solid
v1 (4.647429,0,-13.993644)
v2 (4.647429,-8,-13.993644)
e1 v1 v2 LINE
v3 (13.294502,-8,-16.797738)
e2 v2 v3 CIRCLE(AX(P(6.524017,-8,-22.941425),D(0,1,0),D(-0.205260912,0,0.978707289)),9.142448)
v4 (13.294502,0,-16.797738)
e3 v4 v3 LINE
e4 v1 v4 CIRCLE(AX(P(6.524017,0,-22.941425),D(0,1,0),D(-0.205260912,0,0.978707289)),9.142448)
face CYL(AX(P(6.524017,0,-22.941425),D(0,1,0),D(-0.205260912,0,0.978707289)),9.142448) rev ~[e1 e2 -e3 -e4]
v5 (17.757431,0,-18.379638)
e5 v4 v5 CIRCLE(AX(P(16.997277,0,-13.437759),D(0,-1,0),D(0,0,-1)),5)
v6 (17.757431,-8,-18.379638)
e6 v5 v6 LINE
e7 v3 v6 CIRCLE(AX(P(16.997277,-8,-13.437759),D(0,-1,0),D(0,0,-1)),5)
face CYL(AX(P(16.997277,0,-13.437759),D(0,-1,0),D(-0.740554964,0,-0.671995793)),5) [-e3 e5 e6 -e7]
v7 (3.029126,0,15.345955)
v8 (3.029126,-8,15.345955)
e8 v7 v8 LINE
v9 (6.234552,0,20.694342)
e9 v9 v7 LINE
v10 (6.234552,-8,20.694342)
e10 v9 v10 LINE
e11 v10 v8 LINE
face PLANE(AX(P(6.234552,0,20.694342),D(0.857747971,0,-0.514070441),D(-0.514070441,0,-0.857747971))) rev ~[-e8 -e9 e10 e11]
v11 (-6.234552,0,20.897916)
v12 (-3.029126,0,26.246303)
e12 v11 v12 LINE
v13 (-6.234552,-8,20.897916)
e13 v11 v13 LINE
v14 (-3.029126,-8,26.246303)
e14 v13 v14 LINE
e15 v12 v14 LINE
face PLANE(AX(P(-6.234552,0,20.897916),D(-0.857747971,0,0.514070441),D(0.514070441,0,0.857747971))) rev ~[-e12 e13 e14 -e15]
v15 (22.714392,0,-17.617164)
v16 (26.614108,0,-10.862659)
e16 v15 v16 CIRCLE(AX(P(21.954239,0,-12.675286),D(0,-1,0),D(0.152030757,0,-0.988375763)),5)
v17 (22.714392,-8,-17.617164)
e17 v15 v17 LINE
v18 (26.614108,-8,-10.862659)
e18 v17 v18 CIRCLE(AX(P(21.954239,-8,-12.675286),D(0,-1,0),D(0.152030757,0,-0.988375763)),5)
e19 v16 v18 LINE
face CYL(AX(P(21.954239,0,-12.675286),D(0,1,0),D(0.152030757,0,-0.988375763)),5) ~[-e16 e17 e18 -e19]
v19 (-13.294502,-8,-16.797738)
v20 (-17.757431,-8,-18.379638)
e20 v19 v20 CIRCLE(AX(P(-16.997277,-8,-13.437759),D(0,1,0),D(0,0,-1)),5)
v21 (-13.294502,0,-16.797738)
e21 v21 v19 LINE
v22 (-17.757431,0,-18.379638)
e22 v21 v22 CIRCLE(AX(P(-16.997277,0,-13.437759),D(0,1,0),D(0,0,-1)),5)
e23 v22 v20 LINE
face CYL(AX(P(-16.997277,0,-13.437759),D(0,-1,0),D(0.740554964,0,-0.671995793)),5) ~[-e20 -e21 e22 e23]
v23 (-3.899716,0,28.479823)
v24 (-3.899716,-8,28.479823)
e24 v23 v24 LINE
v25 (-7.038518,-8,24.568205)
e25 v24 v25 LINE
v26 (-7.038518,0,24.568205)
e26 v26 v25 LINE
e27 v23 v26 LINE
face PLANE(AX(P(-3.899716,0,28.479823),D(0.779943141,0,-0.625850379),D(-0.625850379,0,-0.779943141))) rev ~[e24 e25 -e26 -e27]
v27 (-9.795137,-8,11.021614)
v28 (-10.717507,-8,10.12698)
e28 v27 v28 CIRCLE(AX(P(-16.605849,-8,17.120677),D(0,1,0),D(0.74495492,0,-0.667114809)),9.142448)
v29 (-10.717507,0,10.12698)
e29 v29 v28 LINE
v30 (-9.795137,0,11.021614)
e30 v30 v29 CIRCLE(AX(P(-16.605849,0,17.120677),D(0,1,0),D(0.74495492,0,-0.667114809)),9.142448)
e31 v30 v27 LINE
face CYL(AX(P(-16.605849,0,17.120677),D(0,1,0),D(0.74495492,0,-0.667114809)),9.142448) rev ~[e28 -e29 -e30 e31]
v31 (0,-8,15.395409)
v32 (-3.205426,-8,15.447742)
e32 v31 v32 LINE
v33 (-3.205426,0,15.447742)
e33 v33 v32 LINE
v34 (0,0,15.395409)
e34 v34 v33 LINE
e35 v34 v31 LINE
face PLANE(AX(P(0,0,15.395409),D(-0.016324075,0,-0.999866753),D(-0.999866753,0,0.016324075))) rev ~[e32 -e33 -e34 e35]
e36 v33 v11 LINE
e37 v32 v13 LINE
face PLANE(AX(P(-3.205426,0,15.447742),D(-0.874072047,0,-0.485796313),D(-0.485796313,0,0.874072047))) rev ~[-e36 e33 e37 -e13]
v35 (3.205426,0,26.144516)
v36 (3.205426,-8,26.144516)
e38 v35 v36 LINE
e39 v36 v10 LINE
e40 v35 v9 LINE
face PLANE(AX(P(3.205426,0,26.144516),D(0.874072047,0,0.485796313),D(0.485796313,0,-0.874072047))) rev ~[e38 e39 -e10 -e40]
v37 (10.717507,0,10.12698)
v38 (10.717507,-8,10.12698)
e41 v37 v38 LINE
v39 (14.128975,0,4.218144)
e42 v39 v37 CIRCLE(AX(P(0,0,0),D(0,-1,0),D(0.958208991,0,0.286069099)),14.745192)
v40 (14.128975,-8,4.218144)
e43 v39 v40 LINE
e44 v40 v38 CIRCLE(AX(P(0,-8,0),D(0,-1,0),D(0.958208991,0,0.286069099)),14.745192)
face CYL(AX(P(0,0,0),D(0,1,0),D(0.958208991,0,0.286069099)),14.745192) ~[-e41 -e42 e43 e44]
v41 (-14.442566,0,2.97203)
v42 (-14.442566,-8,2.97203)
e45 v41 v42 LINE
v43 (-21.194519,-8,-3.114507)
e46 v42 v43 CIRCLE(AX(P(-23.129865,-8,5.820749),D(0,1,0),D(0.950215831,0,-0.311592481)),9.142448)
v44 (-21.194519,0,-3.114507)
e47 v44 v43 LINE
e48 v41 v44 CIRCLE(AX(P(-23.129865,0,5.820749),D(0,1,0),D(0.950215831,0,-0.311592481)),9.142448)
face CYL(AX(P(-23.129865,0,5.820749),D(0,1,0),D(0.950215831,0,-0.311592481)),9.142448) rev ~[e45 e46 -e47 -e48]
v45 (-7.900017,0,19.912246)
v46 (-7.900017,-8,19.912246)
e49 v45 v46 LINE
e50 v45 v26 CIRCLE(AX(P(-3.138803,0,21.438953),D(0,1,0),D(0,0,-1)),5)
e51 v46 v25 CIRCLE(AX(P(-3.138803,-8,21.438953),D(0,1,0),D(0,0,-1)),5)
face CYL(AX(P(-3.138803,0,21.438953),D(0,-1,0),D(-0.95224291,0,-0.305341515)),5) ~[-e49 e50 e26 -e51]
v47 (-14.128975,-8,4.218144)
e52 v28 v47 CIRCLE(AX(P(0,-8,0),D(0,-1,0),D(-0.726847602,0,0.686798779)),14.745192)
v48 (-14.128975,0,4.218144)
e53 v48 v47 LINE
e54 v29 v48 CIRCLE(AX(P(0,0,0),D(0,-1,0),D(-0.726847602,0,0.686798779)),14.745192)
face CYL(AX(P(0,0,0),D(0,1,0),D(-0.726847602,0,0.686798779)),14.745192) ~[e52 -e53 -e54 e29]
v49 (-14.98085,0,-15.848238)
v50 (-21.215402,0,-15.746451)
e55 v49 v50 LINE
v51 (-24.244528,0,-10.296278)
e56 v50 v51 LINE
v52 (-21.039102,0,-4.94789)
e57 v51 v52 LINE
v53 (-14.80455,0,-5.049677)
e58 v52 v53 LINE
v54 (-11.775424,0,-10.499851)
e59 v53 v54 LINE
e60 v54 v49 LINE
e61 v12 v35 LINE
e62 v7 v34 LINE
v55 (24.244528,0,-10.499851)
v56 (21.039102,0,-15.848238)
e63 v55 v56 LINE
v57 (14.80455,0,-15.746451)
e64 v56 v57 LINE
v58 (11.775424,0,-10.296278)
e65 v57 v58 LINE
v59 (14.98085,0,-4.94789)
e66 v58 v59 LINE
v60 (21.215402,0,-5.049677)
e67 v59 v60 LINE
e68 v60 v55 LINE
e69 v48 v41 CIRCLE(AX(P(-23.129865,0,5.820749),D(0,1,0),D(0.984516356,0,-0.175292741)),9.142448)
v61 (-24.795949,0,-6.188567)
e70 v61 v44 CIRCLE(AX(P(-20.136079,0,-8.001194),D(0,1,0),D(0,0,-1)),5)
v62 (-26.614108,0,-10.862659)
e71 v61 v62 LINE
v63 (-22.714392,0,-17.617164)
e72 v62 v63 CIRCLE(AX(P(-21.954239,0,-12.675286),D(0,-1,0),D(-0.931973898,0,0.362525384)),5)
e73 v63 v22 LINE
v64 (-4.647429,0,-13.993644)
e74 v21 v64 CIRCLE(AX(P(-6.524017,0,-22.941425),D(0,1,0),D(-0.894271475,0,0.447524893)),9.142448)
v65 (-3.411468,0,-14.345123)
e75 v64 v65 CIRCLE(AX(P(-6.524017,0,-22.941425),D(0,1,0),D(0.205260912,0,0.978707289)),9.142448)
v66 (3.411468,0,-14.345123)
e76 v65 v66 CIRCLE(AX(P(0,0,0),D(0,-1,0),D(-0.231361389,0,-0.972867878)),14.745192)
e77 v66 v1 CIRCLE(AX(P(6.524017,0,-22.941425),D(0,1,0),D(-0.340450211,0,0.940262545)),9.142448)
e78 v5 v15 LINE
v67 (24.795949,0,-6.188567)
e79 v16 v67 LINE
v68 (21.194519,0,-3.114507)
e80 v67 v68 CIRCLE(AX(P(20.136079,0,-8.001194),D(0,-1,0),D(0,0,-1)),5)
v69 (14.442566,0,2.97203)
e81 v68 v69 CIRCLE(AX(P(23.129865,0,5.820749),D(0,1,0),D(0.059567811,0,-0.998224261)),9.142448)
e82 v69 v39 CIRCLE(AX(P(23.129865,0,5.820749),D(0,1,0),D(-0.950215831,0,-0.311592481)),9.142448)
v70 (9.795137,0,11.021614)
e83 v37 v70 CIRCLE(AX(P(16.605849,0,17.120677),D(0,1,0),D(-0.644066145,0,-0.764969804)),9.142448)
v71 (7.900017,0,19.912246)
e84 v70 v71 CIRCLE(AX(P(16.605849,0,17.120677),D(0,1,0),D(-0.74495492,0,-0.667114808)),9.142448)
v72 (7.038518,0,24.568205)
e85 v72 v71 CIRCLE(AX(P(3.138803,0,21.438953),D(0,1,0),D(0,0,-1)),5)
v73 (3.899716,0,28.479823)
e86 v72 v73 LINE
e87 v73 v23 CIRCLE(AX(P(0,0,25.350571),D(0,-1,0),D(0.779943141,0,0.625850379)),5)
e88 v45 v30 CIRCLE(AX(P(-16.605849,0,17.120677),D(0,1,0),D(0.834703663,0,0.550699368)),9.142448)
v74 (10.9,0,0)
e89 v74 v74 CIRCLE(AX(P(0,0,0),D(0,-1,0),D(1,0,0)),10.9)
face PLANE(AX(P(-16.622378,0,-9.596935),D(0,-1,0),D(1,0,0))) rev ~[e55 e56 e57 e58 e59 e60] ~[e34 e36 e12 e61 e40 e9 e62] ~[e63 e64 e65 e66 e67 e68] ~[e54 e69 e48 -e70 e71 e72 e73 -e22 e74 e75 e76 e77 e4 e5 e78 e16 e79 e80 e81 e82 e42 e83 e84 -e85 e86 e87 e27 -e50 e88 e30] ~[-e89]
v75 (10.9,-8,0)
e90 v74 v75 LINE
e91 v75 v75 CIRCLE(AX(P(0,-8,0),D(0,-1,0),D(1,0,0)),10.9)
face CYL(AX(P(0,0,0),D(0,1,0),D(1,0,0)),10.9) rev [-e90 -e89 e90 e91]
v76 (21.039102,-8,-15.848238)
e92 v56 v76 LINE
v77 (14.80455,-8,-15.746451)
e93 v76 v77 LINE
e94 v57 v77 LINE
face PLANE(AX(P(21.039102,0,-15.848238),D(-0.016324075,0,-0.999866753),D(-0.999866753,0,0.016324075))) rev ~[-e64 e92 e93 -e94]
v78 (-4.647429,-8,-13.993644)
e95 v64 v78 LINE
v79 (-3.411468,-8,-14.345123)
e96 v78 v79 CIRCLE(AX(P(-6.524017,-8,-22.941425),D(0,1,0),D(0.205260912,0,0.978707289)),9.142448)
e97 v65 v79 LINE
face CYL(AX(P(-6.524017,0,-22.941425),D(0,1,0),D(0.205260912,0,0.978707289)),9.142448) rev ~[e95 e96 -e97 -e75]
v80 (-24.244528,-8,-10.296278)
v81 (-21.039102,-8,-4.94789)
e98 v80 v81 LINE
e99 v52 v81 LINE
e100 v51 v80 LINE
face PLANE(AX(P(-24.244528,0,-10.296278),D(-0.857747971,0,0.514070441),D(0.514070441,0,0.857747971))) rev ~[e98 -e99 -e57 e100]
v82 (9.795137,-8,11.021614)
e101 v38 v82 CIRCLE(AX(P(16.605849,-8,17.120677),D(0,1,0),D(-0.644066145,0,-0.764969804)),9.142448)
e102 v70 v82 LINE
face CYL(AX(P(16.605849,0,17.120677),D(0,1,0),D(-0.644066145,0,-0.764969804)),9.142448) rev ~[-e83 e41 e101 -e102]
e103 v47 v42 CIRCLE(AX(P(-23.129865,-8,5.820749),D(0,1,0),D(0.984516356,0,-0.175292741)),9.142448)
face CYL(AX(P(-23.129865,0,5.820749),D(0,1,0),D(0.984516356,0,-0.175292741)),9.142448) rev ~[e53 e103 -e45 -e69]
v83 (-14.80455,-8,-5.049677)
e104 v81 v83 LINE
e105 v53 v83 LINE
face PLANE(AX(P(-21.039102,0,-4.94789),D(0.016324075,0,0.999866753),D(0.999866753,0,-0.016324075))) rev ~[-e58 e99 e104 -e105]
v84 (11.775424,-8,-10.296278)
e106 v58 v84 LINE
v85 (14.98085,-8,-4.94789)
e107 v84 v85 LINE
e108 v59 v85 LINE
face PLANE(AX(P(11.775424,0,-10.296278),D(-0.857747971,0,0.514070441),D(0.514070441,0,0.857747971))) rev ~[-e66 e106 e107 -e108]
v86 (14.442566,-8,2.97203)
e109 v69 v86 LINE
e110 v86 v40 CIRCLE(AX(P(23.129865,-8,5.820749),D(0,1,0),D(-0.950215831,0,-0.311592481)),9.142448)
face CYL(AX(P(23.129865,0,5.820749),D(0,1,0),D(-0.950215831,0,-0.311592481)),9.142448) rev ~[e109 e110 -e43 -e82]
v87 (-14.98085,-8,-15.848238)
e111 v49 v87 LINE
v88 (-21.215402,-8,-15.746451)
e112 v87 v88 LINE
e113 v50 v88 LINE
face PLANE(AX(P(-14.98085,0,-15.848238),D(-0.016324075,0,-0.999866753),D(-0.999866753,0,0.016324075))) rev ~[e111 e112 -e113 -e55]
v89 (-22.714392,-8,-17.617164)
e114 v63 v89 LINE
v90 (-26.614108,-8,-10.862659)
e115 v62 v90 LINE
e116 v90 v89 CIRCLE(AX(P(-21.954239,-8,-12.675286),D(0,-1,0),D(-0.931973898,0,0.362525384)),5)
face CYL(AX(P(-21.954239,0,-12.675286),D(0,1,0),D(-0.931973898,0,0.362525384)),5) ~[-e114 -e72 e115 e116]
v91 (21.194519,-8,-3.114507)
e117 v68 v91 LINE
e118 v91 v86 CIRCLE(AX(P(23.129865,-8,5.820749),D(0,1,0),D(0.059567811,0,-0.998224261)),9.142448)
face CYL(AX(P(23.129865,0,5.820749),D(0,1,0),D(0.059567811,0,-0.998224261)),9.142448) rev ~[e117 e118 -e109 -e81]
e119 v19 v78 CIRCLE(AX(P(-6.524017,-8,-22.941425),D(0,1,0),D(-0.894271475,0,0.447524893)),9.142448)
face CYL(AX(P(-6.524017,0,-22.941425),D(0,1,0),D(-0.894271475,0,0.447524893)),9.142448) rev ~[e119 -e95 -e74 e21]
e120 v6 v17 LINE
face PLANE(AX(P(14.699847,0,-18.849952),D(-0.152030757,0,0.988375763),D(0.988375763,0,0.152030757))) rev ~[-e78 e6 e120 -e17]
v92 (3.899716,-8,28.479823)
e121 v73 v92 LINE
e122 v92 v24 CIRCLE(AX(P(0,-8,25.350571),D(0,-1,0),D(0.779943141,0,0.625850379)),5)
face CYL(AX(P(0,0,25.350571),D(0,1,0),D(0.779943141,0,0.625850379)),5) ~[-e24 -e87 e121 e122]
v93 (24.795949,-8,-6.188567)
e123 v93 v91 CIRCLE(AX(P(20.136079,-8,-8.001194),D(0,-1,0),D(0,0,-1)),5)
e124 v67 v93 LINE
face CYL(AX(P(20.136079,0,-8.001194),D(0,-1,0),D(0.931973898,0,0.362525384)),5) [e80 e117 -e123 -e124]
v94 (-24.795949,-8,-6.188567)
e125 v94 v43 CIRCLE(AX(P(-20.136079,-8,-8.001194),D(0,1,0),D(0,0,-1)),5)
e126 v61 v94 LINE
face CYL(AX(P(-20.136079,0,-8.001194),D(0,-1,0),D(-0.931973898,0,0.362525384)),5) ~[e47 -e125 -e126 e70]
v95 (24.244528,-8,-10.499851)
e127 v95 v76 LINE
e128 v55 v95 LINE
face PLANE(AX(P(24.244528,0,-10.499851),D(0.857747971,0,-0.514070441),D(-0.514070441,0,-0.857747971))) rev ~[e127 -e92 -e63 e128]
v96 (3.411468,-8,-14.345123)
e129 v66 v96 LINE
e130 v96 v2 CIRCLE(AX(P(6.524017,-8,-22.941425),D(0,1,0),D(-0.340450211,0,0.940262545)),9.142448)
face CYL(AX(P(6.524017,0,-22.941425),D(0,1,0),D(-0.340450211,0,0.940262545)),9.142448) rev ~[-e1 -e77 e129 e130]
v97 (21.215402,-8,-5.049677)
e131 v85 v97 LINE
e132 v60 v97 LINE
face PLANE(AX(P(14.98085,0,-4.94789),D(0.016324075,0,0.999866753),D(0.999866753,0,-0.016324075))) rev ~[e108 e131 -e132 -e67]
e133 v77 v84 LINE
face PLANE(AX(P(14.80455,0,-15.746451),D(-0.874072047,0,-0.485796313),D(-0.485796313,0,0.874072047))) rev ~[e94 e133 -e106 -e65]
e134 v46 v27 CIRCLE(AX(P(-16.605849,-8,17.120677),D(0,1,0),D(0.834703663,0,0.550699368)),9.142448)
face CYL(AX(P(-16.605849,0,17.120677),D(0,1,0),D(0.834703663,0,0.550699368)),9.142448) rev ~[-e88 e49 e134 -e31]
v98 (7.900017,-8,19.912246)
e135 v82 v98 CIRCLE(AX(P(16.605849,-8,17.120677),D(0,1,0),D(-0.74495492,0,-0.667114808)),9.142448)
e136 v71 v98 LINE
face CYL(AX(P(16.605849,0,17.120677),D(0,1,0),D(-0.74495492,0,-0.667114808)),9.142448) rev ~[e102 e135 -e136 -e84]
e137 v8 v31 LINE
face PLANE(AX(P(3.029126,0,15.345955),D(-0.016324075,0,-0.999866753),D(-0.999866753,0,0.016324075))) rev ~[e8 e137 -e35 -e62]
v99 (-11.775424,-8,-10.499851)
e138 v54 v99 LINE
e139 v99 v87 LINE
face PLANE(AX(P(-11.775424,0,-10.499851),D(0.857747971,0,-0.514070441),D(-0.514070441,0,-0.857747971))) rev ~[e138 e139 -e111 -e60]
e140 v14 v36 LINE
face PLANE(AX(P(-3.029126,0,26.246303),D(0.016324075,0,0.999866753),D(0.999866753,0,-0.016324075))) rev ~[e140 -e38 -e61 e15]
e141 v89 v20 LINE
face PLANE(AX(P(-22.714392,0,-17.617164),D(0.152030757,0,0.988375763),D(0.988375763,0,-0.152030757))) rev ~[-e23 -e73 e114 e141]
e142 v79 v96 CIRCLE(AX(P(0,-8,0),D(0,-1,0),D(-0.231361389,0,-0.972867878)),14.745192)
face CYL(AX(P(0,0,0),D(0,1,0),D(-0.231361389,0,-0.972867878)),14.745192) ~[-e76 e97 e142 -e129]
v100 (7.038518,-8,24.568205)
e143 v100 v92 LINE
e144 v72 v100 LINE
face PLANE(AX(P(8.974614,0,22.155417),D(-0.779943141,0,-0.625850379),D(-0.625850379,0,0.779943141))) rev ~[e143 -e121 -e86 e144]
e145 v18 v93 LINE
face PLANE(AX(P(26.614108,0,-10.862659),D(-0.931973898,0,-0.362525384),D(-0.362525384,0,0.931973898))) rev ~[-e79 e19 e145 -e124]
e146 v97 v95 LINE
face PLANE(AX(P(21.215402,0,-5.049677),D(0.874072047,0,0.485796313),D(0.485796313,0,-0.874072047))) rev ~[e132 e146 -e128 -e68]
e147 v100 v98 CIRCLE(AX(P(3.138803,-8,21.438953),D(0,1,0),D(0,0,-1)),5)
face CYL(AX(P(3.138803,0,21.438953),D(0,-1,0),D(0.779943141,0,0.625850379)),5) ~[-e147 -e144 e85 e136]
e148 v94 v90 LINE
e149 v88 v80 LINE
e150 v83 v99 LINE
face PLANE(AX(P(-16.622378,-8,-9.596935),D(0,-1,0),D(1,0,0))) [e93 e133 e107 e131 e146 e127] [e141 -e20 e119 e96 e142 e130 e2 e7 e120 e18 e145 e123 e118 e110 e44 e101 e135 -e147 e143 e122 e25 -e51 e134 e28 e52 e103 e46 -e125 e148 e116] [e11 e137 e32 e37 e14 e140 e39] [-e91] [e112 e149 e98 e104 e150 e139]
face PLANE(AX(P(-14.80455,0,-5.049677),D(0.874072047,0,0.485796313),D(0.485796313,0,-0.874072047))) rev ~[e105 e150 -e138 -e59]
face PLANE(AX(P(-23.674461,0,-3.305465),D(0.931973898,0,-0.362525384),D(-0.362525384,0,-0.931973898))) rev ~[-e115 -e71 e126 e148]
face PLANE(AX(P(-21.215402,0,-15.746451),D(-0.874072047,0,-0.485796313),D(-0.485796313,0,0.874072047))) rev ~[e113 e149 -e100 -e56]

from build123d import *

# Parameters (mm, degrees)
F0_R     = 10.9
F1_DEPTH = 8
F2_R     = 5


with BuildPart() as f1:
    # F0 (on Front) → F1 (new body)
    with BuildSketch(Plane.XZ):
        with BuildLine():
            ThreePointArc((-4.6474292299, -13.9936443391), (-12.7697106566, -7.372595885), (-14.4425661041, 2.9720303942))
            ThreePointArc((-14.4425661041, 2.9720303942), (-17.9890829323, -1.7394577094), (-23.6744608764, -3.305465179))
            Line((-23.6744608764, -3.305465179), (-26.6141080798, -10.8626586404))
            ThreePointArc((-26.6141080798, -10.8626586404), (-26.2843656104, -15.1752855606), (-22.7143923751, -17.617164376))
            Line((-22.7143923751, -17.617164376), (-14.6998472546, -18.8499519504))
            ThreePointArc((-14.6998472546, -18.8499519504), (-10.5009560313, -14.7092739554), (-4.6474292299, -13.9936443391))
        make_face()
        Polygon((-21.2154018643, -15.7464514283), (-24.2445278885, -10.2962775292), (-21.039101849, -4.9478904915), (-14.8045497853, -5.0496773528), (-11.7754237611, -10.4998512519), (-14.9808498006, -15.8482382896), align=None, mode=Mode.SUBTRACT)
        with BuildLine():
            ThreePointArc((9.7951368743, 11.0216139449), (5.2395070905, 13.7828968575), (0, 14.7451917701))
            ThreePointArc((0, 14.7451917701), (-5.2395070905, 13.7828968575), (-9.7951368743, 11.0216139449))
            ThreePointArc((-9.7951368743, 11.0216139449), (-10.2405850834, 10.5580719376), (-10.7175072848, 10.1269797045))
            ThreePointArc((-10.7175072848, 10.1269797045), (-12.7697106566, 7.372595885), (-14.1289753301, 4.2181437217))
            ThreePointArc((-14.1289753301, 4.2181437217), (-14.2638510546, 3.5895708631), (-14.4425661041, 2.9720303942))
            ThreePointArc((-14.4425661041, 2.9720303942), (-12.7697106566, -7.372595885), (-4.6474292299, -13.9936443391))
            ThreePointArc((-4.6474292299, -13.9936443391), (-4.0232659712, -14.1476428006), (-3.4114680453, -14.3451234262))
            ThreePointArc((-3.4114680453, -14.3451234262), (0, -14.7451917701), (3.4114680453, -14.3451234262))
            ThreePointArc((3.4114680453, -14.3451234262), (4.0232659712, -14.1476428006), (4.6474292299, -13.9936443391))
            ThreePointArc((4.6474292299, -13.9936443391), (11.9571718138, -8.6282514191), (14.7451917701, 0))
            ThreePointArc((14.7451917701, 0), (14.6693402577, 1.4936990123), (14.4425661041, 2.9720303942))
            ThreePointArc((14.4425661041, 2.9720303942), (14.2638510546, 3.5895708631), (14.1289753301, 4.2181437217))
            ThreePointArc((14.1289753301, 4.2181437217), (12.7697106566, 7.372595885), (10.7175072848, 10.1269797045))
            ThreePointArc((10.7175072848, 10.1269797045), (10.2405850834, 10.5580719376), (9.7951368743, 11.0216139449))
        make_face()
        Circle(F0_R, mode=Mode.SUBTRACT)
        with BuildLine():
            ThreePointArc((23.6744608764, -3.305465179), (17.9890829323, -1.7394577094), (14.4425661041, 2.9720303942))
            ThreePointArc((14.4425661041, 2.9720303942), (14.6693402577, 1.4936990123), (14.7451917701, 0))
            ThreePointArc((14.7451917701, 0), (11.9571718138, -8.6282514191), (4.6474292299, -13.9936443391))
            ThreePointArc((4.6474292299, -13.9936443391), (10.5009560313, -14.7092739554), (14.6998472546, -18.8499519504))
            Line((14.6998472546, -18.8499519504), (22.7143923751, -17.617164376))
            ThreePointArc((22.7143923751, -17.617164376), (26.2843656104, -15.1752855606), (26.6141080798, -10.8626586404))
            Line((26.6141080798, -10.8626586404), (23.6744608764, -3.305465179))
        make_face()
        Polygon((24.2445278885, -10.4998512519), (21.039101849, -15.8482382896), (14.8045497853, -15.7464514283), (11.7754237611, -10.2962775292), (14.9808498006, -4.9478904915), (21.2154018643, -5.0496773528), align=None, mode=Mode.SUBTRACT)
        with BuildLine():
            ThreePointArc((-9.7951368743, 11.0216139449), (-5.2395070905, 13.7828968575), (0, 14.7451917701))
            ThreePointArc((0, 14.7451917701), (5.2395070905, 13.7828968575), (9.7951368743, 11.0216139449))
            ThreePointArc((9.7951368743, 11.0216139449), (7.488126901, 16.4487316648), (8.9746136218, 22.1554171294))
            Line((8.9746136218, 22.1554171294), (3.8997157047, 28.4798230164))
            ThreePointArc((3.8997157047, 28.4798230164), (0, 30.3505711213), (-3.8997157047, 28.4798230164))
            Line((-3.8997157047, 28.4798230164), (-8.9746136218, 22.1554171294))
            ThreePointArc((-8.9746136218, 22.1554171294), (-7.488126901, 16.4487316648), (-9.7951368743, 11.0216139449))
        make_face()
        Polygon((3.0291260242, 15.3459548821), (0, 15.3954091536), (-3.2054260395, 15.4477417434), (-6.2345520637, 20.8979156424), (-3.0291260242, 26.2463026801), (3.2054260395, 26.1445158188), (6.2345520637, 20.6943419198), align=None, mode=Mode.SUBTRACT)
    extrude(amount=F1_DEPTH)

    # F2
    f2_edges = [f1.edges().sort_by_distance(p)[0] for p in [
        (-23.674461, -4, -3.305465),
        (-14.699847, -4, -18.849952),
        (14.699847, -4, -18.849952),
        (23.674461, -4, -3.305465),
        (8.974614, -4, 22.155417),
        (-8.974614, -4, 22.155417),
    ]]
    fillet(f2_edges, radius=F2_R)


solid = f1.part
